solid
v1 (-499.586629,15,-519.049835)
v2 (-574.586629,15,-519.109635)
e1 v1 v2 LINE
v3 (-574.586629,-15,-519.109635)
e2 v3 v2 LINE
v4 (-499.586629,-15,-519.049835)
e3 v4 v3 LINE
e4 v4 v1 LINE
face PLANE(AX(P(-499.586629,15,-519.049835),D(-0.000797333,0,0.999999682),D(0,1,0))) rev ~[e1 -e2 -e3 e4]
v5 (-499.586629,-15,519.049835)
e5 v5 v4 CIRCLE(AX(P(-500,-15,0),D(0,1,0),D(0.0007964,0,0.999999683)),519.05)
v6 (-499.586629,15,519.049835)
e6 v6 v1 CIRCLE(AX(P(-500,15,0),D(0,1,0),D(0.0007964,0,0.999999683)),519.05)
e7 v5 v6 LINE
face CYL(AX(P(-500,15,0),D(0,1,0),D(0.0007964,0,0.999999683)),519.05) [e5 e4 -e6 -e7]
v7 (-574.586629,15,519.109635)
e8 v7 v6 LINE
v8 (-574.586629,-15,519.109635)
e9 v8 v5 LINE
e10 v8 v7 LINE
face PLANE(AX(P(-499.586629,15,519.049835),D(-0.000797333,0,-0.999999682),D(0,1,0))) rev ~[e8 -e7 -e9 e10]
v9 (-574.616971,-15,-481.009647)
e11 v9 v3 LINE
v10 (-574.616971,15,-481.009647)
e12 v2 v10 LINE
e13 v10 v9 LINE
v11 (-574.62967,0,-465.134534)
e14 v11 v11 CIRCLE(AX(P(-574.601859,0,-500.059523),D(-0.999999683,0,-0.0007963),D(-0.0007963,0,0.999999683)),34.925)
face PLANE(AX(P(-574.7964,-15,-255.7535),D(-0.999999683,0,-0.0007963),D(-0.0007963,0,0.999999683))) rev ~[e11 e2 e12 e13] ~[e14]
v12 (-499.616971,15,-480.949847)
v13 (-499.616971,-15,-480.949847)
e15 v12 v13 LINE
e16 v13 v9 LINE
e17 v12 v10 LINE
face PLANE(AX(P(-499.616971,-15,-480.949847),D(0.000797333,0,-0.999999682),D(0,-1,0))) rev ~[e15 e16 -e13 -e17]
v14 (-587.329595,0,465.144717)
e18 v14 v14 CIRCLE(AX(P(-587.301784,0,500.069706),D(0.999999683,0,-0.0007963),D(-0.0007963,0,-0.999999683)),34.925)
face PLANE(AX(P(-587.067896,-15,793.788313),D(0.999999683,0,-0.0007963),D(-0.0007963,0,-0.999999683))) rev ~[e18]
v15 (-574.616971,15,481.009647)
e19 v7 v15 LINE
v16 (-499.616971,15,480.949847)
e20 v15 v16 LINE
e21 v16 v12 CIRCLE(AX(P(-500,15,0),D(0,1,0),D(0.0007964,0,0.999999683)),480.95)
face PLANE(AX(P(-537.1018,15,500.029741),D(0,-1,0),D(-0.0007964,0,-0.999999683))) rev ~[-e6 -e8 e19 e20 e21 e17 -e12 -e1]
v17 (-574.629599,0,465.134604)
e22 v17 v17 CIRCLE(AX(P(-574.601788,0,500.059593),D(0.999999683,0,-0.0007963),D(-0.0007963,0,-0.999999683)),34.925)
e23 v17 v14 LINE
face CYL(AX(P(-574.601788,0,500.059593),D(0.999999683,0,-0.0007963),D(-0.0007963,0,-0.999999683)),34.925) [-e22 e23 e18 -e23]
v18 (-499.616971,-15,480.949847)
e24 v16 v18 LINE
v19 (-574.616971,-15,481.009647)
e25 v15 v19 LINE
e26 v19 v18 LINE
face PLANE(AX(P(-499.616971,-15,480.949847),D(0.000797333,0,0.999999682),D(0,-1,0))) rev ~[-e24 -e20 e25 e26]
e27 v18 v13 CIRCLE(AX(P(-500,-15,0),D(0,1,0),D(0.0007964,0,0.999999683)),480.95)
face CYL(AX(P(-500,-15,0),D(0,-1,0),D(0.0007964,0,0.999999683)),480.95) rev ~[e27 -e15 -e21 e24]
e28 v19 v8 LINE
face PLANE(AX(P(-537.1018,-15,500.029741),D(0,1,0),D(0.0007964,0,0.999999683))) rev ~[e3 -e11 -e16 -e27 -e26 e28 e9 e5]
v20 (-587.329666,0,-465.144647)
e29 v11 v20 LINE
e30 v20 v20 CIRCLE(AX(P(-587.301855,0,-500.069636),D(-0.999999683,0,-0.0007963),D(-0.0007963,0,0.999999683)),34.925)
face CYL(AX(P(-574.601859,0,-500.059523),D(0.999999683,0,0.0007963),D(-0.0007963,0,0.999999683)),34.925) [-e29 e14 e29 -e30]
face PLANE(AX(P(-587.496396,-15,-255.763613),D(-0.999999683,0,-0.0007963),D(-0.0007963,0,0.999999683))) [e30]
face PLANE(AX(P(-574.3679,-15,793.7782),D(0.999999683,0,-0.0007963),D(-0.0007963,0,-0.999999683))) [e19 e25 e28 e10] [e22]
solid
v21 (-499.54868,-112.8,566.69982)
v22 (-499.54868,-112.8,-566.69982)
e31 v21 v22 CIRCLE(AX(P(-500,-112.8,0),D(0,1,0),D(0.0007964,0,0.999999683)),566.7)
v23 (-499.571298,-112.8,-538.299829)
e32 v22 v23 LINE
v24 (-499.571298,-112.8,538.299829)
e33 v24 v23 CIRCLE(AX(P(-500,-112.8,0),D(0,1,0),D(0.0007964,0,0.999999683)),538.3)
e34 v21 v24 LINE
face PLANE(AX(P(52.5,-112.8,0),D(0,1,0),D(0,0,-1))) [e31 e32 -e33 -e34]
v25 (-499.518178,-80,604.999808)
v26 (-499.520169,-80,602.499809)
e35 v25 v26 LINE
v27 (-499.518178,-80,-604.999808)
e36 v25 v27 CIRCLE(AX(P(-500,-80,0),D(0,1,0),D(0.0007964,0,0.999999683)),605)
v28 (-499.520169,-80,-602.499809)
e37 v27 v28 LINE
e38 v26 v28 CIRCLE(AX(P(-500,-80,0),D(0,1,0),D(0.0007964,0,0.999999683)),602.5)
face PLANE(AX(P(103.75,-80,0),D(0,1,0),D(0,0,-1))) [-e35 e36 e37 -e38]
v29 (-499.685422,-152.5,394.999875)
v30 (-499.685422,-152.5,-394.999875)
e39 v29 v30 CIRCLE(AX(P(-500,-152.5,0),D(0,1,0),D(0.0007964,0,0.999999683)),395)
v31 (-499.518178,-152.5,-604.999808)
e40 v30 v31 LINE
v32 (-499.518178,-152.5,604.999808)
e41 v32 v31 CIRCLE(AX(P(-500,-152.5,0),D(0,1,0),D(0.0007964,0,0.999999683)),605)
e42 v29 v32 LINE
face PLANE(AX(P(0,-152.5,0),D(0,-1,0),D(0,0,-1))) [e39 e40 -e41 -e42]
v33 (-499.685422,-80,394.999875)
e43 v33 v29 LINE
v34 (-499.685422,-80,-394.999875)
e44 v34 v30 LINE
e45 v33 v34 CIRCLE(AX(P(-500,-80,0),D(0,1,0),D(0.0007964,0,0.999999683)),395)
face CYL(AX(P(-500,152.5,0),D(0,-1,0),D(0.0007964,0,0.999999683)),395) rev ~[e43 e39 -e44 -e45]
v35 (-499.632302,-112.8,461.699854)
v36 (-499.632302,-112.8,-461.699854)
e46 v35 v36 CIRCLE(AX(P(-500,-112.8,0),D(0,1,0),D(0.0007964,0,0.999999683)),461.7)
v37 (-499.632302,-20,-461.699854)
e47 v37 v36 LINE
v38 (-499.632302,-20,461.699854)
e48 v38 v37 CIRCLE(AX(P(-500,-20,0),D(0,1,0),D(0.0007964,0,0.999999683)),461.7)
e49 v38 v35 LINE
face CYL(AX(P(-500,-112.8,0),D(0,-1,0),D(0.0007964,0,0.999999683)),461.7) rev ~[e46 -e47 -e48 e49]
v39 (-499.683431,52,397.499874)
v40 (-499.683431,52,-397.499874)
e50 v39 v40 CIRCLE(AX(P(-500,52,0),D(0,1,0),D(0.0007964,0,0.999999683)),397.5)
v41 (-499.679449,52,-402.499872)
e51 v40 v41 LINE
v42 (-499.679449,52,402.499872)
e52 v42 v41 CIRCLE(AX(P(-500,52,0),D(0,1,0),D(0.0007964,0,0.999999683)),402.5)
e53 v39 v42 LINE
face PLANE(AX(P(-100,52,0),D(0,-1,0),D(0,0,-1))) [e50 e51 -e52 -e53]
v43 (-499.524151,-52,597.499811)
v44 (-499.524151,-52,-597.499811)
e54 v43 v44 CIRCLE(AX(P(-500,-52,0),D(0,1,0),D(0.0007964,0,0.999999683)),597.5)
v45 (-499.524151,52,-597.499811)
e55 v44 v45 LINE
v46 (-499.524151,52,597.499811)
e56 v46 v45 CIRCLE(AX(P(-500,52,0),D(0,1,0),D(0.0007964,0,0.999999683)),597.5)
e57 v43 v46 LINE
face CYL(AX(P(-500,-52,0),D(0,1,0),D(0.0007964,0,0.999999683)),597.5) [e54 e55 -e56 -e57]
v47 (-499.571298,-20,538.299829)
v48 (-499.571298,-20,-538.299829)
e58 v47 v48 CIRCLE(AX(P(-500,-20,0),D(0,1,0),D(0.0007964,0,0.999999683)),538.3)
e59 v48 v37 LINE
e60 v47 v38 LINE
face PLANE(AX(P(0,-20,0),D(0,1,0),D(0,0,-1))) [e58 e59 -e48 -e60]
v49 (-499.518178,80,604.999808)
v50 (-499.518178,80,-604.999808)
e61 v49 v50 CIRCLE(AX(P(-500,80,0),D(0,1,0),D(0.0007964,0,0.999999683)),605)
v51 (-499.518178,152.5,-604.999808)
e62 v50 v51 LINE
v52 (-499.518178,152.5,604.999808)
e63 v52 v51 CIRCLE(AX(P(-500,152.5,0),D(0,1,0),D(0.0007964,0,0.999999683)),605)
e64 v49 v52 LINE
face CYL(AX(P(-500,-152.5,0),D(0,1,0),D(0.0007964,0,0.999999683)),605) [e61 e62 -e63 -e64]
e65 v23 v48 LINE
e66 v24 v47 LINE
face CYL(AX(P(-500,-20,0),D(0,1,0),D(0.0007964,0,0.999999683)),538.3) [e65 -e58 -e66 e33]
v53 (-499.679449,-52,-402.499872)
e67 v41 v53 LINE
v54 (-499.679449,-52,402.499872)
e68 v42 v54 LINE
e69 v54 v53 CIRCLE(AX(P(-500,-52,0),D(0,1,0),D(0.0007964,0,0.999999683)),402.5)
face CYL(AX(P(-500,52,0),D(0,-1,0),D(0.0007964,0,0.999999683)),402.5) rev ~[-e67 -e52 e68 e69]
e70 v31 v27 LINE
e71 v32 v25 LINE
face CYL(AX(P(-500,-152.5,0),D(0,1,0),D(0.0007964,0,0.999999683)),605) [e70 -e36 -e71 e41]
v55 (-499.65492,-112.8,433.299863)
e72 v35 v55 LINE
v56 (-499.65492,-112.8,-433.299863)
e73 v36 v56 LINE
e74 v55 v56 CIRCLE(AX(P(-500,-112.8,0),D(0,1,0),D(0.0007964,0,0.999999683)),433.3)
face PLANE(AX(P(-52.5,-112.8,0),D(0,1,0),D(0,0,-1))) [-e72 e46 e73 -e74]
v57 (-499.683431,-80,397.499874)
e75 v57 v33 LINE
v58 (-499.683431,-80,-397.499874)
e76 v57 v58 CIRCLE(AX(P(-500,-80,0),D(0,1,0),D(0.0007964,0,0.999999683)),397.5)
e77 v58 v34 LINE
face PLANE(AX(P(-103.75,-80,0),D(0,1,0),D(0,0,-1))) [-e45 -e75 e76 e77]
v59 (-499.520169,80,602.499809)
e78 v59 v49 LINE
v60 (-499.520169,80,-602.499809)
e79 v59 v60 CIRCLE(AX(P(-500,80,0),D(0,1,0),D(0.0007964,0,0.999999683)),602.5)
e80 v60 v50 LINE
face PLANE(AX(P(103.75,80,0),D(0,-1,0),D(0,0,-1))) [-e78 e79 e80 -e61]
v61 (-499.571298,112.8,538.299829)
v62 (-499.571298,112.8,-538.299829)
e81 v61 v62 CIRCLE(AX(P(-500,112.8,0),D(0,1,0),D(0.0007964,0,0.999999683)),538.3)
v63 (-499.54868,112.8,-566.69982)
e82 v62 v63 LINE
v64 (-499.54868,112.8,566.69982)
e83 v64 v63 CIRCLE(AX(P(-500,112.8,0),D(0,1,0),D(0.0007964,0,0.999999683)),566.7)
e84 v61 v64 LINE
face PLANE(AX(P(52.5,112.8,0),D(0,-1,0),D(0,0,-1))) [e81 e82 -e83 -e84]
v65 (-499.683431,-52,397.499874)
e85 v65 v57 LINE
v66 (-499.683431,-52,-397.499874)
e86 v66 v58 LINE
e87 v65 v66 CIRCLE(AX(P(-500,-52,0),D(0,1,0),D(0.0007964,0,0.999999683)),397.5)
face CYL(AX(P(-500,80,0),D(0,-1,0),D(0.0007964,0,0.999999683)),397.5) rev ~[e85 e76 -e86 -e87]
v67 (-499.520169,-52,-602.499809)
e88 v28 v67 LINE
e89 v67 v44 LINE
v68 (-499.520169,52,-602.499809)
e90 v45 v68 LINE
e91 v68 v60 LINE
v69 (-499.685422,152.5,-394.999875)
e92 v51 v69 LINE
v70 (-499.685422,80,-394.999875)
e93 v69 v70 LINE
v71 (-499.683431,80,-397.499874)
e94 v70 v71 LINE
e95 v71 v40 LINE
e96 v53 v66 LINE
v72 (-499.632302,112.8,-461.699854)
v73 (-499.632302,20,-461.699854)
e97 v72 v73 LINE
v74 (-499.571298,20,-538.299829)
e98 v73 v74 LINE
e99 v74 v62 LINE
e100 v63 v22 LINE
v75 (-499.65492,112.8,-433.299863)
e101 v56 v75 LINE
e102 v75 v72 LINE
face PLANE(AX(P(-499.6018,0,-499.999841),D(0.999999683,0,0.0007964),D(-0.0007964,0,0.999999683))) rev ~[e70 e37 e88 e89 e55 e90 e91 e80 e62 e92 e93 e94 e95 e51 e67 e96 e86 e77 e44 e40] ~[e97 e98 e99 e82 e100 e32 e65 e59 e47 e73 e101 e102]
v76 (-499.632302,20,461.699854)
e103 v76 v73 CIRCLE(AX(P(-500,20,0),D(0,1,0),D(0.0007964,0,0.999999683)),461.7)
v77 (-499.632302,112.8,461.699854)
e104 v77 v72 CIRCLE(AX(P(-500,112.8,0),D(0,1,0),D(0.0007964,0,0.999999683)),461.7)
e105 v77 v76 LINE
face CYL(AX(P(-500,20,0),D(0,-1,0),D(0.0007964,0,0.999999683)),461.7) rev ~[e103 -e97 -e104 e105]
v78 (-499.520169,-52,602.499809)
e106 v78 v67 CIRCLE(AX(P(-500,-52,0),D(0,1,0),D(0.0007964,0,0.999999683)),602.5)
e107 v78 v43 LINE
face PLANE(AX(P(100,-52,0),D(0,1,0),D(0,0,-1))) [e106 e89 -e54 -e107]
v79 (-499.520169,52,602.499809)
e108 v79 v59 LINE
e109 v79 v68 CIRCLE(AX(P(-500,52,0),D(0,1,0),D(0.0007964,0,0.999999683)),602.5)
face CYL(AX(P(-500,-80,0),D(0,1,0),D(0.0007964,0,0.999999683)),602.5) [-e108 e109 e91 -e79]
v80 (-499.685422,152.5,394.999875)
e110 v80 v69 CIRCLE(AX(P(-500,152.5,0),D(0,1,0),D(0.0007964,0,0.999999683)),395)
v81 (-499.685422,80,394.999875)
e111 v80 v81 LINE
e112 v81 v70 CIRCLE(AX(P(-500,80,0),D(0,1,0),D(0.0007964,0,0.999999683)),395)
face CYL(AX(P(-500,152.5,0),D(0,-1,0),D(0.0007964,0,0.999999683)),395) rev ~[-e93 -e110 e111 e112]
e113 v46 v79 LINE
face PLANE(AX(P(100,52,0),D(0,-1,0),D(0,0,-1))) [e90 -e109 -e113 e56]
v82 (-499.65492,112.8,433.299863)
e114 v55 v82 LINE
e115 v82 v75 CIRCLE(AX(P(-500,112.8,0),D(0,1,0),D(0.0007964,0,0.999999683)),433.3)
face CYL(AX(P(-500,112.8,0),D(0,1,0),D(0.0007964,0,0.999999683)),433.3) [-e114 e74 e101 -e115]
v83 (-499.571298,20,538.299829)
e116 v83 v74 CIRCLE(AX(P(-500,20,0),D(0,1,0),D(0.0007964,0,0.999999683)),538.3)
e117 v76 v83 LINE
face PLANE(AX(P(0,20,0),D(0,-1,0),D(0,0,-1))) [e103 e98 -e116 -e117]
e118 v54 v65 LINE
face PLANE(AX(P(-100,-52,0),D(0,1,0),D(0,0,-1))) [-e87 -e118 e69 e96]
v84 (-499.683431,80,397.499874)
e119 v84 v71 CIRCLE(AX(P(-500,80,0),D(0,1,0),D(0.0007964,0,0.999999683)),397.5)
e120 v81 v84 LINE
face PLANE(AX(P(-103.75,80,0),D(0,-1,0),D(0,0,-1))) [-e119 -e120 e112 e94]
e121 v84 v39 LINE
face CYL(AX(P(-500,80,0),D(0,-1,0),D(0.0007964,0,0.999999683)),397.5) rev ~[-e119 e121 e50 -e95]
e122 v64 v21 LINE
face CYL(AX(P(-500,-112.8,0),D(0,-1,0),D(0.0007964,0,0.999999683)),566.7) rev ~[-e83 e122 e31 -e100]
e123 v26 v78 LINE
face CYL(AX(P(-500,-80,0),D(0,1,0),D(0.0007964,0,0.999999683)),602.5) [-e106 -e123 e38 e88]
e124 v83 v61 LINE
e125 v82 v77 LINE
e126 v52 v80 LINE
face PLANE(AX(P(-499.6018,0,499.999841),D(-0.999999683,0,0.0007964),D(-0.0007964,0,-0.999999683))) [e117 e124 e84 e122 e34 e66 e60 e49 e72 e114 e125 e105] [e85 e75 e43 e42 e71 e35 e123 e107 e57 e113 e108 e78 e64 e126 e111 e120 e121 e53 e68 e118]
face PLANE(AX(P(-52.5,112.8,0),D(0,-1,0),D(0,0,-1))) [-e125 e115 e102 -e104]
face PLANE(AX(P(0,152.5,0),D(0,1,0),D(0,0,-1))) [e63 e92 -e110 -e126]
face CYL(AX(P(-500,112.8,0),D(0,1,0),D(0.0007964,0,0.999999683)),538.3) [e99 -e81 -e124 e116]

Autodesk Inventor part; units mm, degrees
ref_plane "YZ Plane" through (0, 0, 0) normal (1, 0, 0) x (0, 1, 0)
ref_plane "XY Plane" through (0, 0, 0) normal (0, 0, 1) x (1, 0, 0)
sketch "Sketch1" plane through (0, 0, 0) normal (0, 0, 1) x (0, 1, 0)
  line L0 (-152.5, -105) -> (152.5, -105)
  line L1 (152.5, -105) -> (152.5, 105)
  line L2 (152.5, 105) -> (-152.5, 105)
  line L3 (-152.5, 105) -> (-152.5, -105)
  line L4 (-152.5, -105) -> (152.5, 105) construction
  line L5 (152.5, -105) -> (-152.5, 105) construction
  line L6 (112.8, 66.7) -> (-112.8, 66.7)
  line L7 (-112.8, 66.7) -> (-112.8, 38.3)
  line L8 (-112.8, 38.3) -> (-20, 38.3)
  line L9 (-20, 38.3) -> (-20, -38.3)
  line L10 (-20, -38.3) -> (-112.8, -38.3)
  line L11 (-112.8, -38.3) -> (-112.8, -66.7)
  line L12 (-112.8, -66.7) -> (112.8, -66.7)
  line L13 (112.8, -66.7) -> (112.8, -38.3)
  line L14 (112.8, -38.3) -> (20, -38.3)
  line L15 (20, -38.3) -> (20, 38.3)
  line L16 (20, 38.3) -> (112.8, 38.3)
  line L17 (112.8, 38.3) -> (112.8, 66.7)
  line L18 (-80, 105) -> (80, 105)
  line L19 (80, 105) -> (80, 102.5)
  line L20 (80, 102.5) -> (-80, 102.5)
  line L21 (-80, 102.5) -> (-80, 105)
  line L22 (-52, 102.5) -> (52, 102.5)
  line L23 (52, 102.5) -> (52, 97.5)
  line L24 (52, 97.5) -> (-52, 97.5)
  line L25 (-52, 97.5) -> (-52, 102.5)
  line L26 (-80, -102.5) -> (80, -102.5)
  line L27 (80, -102.5) -> (80, -105)
  line L28 (80, -105) -> (-80, -105)
  line L29 (-80, -105) -> (-80, -102.5)
  line L30 (-52, -97.5) -> (52, -97.5)
  line L31 (52, -97.5) -> (52, -102.5)
  line L32 (52, -102.5) -> (-52, -102.5)
  line L33 (-52, -102.5) -> (-52, -97.5)
  point P0 (0, 0)
  point P1 (20, 0)
  point P2 (-20, 0)
  point P3 (0, 0)
  point P4 (0, 66.7)
  point P5 (0, 0)
  point P6 (0, -66.7)
  point P7 (0, 102.5)
  point P8 (0, 105)
  point P9 (0, -102.5)
  point P10 (0, -105)
  dimension "d6" = 305
  dimension "d7" = 210
  dimension "d8" = 225.6
  dimension "d9" = 28.4
  dimension "d10" = 40
  dimension "d11" = 76.6
  dimension "d12" = 38.3
  dimension "d46" = 2.5
  dimension "d47" = 5
  dimension "d48" = 104
  dimension "d49" = 160
sketch "Sketch2" plane through (0, 0, 0) normal (0, 1, 0) x (-1, 0, 0)
  line L0 (0, -700) -> (0, 700) projected
  arc A0 (499.6018, 499.9998) -> (499.6018, -499.9998) centre (500, 0) ccw
  line L1 (500, 0) -> (0, 0) construction
  line L2 (499.6018, 499.9998) -> (500, 0) construction
  line L3 (499.6018, -499.9998) -> (500, 0) construction
  dimension "d54" = 90
  dimension "d58" = 1570
  dimension "d59" = 179.909
sweep "Sweep1" add profiles "Sketch1" path "Sketch2" path curves A0 contours L3 L2 L21 L20 L25 L24 L23 L19 L1 L0 L27 L26 L31 L30 L33 L29
sketch "Sketch3" plane through (0, 0, 0) normal (0, 0, 1) x (0, 1, 0)
  line L0 (20, 38.3) -> (112.8, 38.3) projected
  line L1 (112.8, 38.3) -> (112.8, 66.7) projected
  line L2 (112.8, 66.7) -> (-112.8, 66.7) projected
  line L3 (-112.8, 66.7) -> (-112.8, 38.3) projected
  line L4 (-112.8, 38.3) -> (-20, 38.3) projected
  line L5 (-20, 38.3) -> (-20, -38.3) projected
  line L6 (-20, -38.3) -> (-112.8, -38.3) projected
  line L7 (-112.8, -38.3) -> (-112.8, -66.7) projected
  line L8 (-112.8, -66.7) -> (112.8, -66.7) projected
  line L9 (112.8, -66.7) -> (112.8, -38.3) projected
  line L10 (112.8, -38.3) -> (20, -38.3) projected
  line L11 (20, -38.3) -> (20, 38.3) projected
  line L12 (80, 102.5) -> (80, 105) projected
  line L13 (80, 105) -> (152.5, 105) projected
  line L14 (152.5, 105) -> (152.5, -105) projected
  line L15 (152.5, -105) -> (80, -105) projected
  line L16 (80, -105) -> (80, -102.5) projected
  line L17 (80, -102.5) -> (52, -102.5) projected
  line L18 (52, -102.5) -> (52, -97.5) projected
  line L19 (52, -97.5) -> (-52, -97.5) projected
  line L20 (-52, -97.5) -> (-52, -102.5) projected
  line L21 (-52, -102.5) -> (-80, -102.5) projected
  line L22 (-80, -102.5) -> (-80, -105) projected
  line L23 (-80, -105) -> (-152.5, -105) projected
  line L24 (-152.5, -105) -> (-152.5, 105) projected
  line L25 (-152.5, 105) -> (-80, 105) projected
  line L26 (-80, 105) -> (-80, 102.5) projected
  line L27 (-80, 102.5) -> (-52, 102.5) projected
  line L28 (-52, 102.5) -> (-52, 97.5) projected
  line L29 (-52, 97.5) -> (52, 97.5) projected
  line L30 (52, 97.5) -> (52, 102.5) projected
  line L31 (52, 102.5) -> (80, 102.5) projected
  line L32 (23.9, 65.45) -> (108.9, 65.45)
  line L33 (108.9, 65.45) -> (108.9, 39.55)
  line L34 (108.9, 39.55) -> (23.9, 39.55)
  line L35 (23.9, 39.55) -> (23.9, 65.45)
  line L36 (23.9, 65.45) -> (108.9, 39.55) construction
  line L37 (108.9, 65.45) -> (23.9, 39.55) construction
  line L38 (0, 226) -> (0, -621) projected
  line L39 (-23.9, 65.45) -> (-108.9, 65.45)
  line L40 (-108.9, 65.45) -> (-108.9, 39.55)
  line L41 (-108.9, 39.55) -> (-23.9, 39.55)
  line L42 (-23.9, 39.55) -> (-23.9, 65.45)
  point P0 (112.8, -500)
  point P1 (66.4, 52.5)
  point P2 (66.4, 52.5)
  point P3 (66.4, 38.3)
  point P4 (108.9, 52.5)
  point P5 (112.8, 52.5)
  dimension "d60" = 85
  dimension "d61" = 25.9
ref_plane "Work Plane2" through (-52.5, 66.4, 0) normal (0, 1, 0) x (-1, 0, 0)
sketch "Sketch10" plane through (-52.5, 66.4, 0) normal (0, 1, 0) x (-1, 0, 0)
  arc A0 (447.155, 433.2999) -> (447.155, -433.2999) centre (447.5, 0) ccw projected
  arc A1 (447.0487, 566.6998) -> (447.0487, -566.6998) centre (447.5, 0) ccw projected
  arc A2 (447.155, 433.2999) -> (447.0487, 566.6998) centre (447.1018, 499.9998) ccw
  arc A3 (447.0487, -566.6998) -> (447.155, -433.2999) centre (447.1018, -499.9998) ccw
  point P0 (-52.5, 0)
sweep "Sweep5" [suppressed]
sketch "Sketch5" plane through (0, 0, 0) normal (0, 0, 1) x (0, 1, 0)
  line L0 (-15, 19.05) -> (15, 19.05)
  line L1 (15, 19.05) -> (15, -19.05)
  line L2 (15, -19.05) -> (-15, -19.05)
  line L3 (-15, -19.05) -> (-15, 19.05)
  line L4 (-15, 19.05) -> (15, -19.05) construction
  line L5 (15, 19.05) -> (-15, -19.05) construction
  point P0 (0, 0)
  dimension "d27" = 30
  dimension "d28" = 38.1
sketch "Sketch6" plane through (0, 0, 0) normal (0, 1, 0) x (-1, 0, 0)
  arc A0 (499.6018, 499.9998) -> (499.6018, -499.9998) centre (500, 0) ccw projected
  line L0 (499.6018, 499.9998) -> (574.6018, 500.0596)
  line L1 (499.6018, -499.9998) -> (574.6018, -500.0596)
  dimension "d64" = 75
  dimension "d65" = 75
sweep "Sweep4" add profiles "Sketch5" path "Sketch6"
sketch "Sketch7" plane through (-574.3679, -15, 793.7782) normal (0.9999997, 0, -0.0007963) x (-0.0007963, 0, -0.9999997)
  circle A0 centre (293.7187, 15) radius 34.925
  line L0 (274.6687, 0) -> (274.6687, 30) projected
  line L1 (274.6687, 30) -> (312.7687, 30) projected
  line L2 (312.7687, 30) -> (312.7687, 0) projected
  line L3 (312.7687, 0) -> (274.6687, 0) projected
  point P0 (293.7187, 30)
  point P1 (312.7687, 15)
  dimension "d32" = 69.85
extrude "Extrusion1" add sketch "Sketch7" against normal blind 12.7 contours A0 | L0 L1 L2 L3
sketch "Sketch9" plane through (-574.7964, -15, -255.7535) normal (-0.9999997, 0, -0.0007963) x (-0.0007963, 0, 0.9999997)
  circle A0 centre (-244.3061, 15) radius 34.925
  line L0 (-263.3561, 0) -> (-225.2561, 0) projected
  line L1 (-263.3561, 30) -> (-263.3561, 0) projected
  line L2 (-225.2561, 30) -> (-263.3561, 30) projected
  line L3 (-225.2561, 0) -> (-225.2561, 30) projected
  point P0 (-244.3061, 30)
  point P1 (-263.3561, 15)
  dimension "d40" = 69.85
extrude "Extrusion3" add sketch "Sketch9" along normal blind 12.7 contours A0 | L1 L2 L3 L0
equation "\"d58\" = Length"
equation "\"d59\" = Angle"
equation "\"d65\" = d64"
equation "\"d40\" = d32"
equation "\"d41\" = d33"
equation "\"Angle\" = 179.909deg"
equation "\"Length\" = 1570"
equation "\"d33\" = 12.7"
properties part number "Sbend100_0"
